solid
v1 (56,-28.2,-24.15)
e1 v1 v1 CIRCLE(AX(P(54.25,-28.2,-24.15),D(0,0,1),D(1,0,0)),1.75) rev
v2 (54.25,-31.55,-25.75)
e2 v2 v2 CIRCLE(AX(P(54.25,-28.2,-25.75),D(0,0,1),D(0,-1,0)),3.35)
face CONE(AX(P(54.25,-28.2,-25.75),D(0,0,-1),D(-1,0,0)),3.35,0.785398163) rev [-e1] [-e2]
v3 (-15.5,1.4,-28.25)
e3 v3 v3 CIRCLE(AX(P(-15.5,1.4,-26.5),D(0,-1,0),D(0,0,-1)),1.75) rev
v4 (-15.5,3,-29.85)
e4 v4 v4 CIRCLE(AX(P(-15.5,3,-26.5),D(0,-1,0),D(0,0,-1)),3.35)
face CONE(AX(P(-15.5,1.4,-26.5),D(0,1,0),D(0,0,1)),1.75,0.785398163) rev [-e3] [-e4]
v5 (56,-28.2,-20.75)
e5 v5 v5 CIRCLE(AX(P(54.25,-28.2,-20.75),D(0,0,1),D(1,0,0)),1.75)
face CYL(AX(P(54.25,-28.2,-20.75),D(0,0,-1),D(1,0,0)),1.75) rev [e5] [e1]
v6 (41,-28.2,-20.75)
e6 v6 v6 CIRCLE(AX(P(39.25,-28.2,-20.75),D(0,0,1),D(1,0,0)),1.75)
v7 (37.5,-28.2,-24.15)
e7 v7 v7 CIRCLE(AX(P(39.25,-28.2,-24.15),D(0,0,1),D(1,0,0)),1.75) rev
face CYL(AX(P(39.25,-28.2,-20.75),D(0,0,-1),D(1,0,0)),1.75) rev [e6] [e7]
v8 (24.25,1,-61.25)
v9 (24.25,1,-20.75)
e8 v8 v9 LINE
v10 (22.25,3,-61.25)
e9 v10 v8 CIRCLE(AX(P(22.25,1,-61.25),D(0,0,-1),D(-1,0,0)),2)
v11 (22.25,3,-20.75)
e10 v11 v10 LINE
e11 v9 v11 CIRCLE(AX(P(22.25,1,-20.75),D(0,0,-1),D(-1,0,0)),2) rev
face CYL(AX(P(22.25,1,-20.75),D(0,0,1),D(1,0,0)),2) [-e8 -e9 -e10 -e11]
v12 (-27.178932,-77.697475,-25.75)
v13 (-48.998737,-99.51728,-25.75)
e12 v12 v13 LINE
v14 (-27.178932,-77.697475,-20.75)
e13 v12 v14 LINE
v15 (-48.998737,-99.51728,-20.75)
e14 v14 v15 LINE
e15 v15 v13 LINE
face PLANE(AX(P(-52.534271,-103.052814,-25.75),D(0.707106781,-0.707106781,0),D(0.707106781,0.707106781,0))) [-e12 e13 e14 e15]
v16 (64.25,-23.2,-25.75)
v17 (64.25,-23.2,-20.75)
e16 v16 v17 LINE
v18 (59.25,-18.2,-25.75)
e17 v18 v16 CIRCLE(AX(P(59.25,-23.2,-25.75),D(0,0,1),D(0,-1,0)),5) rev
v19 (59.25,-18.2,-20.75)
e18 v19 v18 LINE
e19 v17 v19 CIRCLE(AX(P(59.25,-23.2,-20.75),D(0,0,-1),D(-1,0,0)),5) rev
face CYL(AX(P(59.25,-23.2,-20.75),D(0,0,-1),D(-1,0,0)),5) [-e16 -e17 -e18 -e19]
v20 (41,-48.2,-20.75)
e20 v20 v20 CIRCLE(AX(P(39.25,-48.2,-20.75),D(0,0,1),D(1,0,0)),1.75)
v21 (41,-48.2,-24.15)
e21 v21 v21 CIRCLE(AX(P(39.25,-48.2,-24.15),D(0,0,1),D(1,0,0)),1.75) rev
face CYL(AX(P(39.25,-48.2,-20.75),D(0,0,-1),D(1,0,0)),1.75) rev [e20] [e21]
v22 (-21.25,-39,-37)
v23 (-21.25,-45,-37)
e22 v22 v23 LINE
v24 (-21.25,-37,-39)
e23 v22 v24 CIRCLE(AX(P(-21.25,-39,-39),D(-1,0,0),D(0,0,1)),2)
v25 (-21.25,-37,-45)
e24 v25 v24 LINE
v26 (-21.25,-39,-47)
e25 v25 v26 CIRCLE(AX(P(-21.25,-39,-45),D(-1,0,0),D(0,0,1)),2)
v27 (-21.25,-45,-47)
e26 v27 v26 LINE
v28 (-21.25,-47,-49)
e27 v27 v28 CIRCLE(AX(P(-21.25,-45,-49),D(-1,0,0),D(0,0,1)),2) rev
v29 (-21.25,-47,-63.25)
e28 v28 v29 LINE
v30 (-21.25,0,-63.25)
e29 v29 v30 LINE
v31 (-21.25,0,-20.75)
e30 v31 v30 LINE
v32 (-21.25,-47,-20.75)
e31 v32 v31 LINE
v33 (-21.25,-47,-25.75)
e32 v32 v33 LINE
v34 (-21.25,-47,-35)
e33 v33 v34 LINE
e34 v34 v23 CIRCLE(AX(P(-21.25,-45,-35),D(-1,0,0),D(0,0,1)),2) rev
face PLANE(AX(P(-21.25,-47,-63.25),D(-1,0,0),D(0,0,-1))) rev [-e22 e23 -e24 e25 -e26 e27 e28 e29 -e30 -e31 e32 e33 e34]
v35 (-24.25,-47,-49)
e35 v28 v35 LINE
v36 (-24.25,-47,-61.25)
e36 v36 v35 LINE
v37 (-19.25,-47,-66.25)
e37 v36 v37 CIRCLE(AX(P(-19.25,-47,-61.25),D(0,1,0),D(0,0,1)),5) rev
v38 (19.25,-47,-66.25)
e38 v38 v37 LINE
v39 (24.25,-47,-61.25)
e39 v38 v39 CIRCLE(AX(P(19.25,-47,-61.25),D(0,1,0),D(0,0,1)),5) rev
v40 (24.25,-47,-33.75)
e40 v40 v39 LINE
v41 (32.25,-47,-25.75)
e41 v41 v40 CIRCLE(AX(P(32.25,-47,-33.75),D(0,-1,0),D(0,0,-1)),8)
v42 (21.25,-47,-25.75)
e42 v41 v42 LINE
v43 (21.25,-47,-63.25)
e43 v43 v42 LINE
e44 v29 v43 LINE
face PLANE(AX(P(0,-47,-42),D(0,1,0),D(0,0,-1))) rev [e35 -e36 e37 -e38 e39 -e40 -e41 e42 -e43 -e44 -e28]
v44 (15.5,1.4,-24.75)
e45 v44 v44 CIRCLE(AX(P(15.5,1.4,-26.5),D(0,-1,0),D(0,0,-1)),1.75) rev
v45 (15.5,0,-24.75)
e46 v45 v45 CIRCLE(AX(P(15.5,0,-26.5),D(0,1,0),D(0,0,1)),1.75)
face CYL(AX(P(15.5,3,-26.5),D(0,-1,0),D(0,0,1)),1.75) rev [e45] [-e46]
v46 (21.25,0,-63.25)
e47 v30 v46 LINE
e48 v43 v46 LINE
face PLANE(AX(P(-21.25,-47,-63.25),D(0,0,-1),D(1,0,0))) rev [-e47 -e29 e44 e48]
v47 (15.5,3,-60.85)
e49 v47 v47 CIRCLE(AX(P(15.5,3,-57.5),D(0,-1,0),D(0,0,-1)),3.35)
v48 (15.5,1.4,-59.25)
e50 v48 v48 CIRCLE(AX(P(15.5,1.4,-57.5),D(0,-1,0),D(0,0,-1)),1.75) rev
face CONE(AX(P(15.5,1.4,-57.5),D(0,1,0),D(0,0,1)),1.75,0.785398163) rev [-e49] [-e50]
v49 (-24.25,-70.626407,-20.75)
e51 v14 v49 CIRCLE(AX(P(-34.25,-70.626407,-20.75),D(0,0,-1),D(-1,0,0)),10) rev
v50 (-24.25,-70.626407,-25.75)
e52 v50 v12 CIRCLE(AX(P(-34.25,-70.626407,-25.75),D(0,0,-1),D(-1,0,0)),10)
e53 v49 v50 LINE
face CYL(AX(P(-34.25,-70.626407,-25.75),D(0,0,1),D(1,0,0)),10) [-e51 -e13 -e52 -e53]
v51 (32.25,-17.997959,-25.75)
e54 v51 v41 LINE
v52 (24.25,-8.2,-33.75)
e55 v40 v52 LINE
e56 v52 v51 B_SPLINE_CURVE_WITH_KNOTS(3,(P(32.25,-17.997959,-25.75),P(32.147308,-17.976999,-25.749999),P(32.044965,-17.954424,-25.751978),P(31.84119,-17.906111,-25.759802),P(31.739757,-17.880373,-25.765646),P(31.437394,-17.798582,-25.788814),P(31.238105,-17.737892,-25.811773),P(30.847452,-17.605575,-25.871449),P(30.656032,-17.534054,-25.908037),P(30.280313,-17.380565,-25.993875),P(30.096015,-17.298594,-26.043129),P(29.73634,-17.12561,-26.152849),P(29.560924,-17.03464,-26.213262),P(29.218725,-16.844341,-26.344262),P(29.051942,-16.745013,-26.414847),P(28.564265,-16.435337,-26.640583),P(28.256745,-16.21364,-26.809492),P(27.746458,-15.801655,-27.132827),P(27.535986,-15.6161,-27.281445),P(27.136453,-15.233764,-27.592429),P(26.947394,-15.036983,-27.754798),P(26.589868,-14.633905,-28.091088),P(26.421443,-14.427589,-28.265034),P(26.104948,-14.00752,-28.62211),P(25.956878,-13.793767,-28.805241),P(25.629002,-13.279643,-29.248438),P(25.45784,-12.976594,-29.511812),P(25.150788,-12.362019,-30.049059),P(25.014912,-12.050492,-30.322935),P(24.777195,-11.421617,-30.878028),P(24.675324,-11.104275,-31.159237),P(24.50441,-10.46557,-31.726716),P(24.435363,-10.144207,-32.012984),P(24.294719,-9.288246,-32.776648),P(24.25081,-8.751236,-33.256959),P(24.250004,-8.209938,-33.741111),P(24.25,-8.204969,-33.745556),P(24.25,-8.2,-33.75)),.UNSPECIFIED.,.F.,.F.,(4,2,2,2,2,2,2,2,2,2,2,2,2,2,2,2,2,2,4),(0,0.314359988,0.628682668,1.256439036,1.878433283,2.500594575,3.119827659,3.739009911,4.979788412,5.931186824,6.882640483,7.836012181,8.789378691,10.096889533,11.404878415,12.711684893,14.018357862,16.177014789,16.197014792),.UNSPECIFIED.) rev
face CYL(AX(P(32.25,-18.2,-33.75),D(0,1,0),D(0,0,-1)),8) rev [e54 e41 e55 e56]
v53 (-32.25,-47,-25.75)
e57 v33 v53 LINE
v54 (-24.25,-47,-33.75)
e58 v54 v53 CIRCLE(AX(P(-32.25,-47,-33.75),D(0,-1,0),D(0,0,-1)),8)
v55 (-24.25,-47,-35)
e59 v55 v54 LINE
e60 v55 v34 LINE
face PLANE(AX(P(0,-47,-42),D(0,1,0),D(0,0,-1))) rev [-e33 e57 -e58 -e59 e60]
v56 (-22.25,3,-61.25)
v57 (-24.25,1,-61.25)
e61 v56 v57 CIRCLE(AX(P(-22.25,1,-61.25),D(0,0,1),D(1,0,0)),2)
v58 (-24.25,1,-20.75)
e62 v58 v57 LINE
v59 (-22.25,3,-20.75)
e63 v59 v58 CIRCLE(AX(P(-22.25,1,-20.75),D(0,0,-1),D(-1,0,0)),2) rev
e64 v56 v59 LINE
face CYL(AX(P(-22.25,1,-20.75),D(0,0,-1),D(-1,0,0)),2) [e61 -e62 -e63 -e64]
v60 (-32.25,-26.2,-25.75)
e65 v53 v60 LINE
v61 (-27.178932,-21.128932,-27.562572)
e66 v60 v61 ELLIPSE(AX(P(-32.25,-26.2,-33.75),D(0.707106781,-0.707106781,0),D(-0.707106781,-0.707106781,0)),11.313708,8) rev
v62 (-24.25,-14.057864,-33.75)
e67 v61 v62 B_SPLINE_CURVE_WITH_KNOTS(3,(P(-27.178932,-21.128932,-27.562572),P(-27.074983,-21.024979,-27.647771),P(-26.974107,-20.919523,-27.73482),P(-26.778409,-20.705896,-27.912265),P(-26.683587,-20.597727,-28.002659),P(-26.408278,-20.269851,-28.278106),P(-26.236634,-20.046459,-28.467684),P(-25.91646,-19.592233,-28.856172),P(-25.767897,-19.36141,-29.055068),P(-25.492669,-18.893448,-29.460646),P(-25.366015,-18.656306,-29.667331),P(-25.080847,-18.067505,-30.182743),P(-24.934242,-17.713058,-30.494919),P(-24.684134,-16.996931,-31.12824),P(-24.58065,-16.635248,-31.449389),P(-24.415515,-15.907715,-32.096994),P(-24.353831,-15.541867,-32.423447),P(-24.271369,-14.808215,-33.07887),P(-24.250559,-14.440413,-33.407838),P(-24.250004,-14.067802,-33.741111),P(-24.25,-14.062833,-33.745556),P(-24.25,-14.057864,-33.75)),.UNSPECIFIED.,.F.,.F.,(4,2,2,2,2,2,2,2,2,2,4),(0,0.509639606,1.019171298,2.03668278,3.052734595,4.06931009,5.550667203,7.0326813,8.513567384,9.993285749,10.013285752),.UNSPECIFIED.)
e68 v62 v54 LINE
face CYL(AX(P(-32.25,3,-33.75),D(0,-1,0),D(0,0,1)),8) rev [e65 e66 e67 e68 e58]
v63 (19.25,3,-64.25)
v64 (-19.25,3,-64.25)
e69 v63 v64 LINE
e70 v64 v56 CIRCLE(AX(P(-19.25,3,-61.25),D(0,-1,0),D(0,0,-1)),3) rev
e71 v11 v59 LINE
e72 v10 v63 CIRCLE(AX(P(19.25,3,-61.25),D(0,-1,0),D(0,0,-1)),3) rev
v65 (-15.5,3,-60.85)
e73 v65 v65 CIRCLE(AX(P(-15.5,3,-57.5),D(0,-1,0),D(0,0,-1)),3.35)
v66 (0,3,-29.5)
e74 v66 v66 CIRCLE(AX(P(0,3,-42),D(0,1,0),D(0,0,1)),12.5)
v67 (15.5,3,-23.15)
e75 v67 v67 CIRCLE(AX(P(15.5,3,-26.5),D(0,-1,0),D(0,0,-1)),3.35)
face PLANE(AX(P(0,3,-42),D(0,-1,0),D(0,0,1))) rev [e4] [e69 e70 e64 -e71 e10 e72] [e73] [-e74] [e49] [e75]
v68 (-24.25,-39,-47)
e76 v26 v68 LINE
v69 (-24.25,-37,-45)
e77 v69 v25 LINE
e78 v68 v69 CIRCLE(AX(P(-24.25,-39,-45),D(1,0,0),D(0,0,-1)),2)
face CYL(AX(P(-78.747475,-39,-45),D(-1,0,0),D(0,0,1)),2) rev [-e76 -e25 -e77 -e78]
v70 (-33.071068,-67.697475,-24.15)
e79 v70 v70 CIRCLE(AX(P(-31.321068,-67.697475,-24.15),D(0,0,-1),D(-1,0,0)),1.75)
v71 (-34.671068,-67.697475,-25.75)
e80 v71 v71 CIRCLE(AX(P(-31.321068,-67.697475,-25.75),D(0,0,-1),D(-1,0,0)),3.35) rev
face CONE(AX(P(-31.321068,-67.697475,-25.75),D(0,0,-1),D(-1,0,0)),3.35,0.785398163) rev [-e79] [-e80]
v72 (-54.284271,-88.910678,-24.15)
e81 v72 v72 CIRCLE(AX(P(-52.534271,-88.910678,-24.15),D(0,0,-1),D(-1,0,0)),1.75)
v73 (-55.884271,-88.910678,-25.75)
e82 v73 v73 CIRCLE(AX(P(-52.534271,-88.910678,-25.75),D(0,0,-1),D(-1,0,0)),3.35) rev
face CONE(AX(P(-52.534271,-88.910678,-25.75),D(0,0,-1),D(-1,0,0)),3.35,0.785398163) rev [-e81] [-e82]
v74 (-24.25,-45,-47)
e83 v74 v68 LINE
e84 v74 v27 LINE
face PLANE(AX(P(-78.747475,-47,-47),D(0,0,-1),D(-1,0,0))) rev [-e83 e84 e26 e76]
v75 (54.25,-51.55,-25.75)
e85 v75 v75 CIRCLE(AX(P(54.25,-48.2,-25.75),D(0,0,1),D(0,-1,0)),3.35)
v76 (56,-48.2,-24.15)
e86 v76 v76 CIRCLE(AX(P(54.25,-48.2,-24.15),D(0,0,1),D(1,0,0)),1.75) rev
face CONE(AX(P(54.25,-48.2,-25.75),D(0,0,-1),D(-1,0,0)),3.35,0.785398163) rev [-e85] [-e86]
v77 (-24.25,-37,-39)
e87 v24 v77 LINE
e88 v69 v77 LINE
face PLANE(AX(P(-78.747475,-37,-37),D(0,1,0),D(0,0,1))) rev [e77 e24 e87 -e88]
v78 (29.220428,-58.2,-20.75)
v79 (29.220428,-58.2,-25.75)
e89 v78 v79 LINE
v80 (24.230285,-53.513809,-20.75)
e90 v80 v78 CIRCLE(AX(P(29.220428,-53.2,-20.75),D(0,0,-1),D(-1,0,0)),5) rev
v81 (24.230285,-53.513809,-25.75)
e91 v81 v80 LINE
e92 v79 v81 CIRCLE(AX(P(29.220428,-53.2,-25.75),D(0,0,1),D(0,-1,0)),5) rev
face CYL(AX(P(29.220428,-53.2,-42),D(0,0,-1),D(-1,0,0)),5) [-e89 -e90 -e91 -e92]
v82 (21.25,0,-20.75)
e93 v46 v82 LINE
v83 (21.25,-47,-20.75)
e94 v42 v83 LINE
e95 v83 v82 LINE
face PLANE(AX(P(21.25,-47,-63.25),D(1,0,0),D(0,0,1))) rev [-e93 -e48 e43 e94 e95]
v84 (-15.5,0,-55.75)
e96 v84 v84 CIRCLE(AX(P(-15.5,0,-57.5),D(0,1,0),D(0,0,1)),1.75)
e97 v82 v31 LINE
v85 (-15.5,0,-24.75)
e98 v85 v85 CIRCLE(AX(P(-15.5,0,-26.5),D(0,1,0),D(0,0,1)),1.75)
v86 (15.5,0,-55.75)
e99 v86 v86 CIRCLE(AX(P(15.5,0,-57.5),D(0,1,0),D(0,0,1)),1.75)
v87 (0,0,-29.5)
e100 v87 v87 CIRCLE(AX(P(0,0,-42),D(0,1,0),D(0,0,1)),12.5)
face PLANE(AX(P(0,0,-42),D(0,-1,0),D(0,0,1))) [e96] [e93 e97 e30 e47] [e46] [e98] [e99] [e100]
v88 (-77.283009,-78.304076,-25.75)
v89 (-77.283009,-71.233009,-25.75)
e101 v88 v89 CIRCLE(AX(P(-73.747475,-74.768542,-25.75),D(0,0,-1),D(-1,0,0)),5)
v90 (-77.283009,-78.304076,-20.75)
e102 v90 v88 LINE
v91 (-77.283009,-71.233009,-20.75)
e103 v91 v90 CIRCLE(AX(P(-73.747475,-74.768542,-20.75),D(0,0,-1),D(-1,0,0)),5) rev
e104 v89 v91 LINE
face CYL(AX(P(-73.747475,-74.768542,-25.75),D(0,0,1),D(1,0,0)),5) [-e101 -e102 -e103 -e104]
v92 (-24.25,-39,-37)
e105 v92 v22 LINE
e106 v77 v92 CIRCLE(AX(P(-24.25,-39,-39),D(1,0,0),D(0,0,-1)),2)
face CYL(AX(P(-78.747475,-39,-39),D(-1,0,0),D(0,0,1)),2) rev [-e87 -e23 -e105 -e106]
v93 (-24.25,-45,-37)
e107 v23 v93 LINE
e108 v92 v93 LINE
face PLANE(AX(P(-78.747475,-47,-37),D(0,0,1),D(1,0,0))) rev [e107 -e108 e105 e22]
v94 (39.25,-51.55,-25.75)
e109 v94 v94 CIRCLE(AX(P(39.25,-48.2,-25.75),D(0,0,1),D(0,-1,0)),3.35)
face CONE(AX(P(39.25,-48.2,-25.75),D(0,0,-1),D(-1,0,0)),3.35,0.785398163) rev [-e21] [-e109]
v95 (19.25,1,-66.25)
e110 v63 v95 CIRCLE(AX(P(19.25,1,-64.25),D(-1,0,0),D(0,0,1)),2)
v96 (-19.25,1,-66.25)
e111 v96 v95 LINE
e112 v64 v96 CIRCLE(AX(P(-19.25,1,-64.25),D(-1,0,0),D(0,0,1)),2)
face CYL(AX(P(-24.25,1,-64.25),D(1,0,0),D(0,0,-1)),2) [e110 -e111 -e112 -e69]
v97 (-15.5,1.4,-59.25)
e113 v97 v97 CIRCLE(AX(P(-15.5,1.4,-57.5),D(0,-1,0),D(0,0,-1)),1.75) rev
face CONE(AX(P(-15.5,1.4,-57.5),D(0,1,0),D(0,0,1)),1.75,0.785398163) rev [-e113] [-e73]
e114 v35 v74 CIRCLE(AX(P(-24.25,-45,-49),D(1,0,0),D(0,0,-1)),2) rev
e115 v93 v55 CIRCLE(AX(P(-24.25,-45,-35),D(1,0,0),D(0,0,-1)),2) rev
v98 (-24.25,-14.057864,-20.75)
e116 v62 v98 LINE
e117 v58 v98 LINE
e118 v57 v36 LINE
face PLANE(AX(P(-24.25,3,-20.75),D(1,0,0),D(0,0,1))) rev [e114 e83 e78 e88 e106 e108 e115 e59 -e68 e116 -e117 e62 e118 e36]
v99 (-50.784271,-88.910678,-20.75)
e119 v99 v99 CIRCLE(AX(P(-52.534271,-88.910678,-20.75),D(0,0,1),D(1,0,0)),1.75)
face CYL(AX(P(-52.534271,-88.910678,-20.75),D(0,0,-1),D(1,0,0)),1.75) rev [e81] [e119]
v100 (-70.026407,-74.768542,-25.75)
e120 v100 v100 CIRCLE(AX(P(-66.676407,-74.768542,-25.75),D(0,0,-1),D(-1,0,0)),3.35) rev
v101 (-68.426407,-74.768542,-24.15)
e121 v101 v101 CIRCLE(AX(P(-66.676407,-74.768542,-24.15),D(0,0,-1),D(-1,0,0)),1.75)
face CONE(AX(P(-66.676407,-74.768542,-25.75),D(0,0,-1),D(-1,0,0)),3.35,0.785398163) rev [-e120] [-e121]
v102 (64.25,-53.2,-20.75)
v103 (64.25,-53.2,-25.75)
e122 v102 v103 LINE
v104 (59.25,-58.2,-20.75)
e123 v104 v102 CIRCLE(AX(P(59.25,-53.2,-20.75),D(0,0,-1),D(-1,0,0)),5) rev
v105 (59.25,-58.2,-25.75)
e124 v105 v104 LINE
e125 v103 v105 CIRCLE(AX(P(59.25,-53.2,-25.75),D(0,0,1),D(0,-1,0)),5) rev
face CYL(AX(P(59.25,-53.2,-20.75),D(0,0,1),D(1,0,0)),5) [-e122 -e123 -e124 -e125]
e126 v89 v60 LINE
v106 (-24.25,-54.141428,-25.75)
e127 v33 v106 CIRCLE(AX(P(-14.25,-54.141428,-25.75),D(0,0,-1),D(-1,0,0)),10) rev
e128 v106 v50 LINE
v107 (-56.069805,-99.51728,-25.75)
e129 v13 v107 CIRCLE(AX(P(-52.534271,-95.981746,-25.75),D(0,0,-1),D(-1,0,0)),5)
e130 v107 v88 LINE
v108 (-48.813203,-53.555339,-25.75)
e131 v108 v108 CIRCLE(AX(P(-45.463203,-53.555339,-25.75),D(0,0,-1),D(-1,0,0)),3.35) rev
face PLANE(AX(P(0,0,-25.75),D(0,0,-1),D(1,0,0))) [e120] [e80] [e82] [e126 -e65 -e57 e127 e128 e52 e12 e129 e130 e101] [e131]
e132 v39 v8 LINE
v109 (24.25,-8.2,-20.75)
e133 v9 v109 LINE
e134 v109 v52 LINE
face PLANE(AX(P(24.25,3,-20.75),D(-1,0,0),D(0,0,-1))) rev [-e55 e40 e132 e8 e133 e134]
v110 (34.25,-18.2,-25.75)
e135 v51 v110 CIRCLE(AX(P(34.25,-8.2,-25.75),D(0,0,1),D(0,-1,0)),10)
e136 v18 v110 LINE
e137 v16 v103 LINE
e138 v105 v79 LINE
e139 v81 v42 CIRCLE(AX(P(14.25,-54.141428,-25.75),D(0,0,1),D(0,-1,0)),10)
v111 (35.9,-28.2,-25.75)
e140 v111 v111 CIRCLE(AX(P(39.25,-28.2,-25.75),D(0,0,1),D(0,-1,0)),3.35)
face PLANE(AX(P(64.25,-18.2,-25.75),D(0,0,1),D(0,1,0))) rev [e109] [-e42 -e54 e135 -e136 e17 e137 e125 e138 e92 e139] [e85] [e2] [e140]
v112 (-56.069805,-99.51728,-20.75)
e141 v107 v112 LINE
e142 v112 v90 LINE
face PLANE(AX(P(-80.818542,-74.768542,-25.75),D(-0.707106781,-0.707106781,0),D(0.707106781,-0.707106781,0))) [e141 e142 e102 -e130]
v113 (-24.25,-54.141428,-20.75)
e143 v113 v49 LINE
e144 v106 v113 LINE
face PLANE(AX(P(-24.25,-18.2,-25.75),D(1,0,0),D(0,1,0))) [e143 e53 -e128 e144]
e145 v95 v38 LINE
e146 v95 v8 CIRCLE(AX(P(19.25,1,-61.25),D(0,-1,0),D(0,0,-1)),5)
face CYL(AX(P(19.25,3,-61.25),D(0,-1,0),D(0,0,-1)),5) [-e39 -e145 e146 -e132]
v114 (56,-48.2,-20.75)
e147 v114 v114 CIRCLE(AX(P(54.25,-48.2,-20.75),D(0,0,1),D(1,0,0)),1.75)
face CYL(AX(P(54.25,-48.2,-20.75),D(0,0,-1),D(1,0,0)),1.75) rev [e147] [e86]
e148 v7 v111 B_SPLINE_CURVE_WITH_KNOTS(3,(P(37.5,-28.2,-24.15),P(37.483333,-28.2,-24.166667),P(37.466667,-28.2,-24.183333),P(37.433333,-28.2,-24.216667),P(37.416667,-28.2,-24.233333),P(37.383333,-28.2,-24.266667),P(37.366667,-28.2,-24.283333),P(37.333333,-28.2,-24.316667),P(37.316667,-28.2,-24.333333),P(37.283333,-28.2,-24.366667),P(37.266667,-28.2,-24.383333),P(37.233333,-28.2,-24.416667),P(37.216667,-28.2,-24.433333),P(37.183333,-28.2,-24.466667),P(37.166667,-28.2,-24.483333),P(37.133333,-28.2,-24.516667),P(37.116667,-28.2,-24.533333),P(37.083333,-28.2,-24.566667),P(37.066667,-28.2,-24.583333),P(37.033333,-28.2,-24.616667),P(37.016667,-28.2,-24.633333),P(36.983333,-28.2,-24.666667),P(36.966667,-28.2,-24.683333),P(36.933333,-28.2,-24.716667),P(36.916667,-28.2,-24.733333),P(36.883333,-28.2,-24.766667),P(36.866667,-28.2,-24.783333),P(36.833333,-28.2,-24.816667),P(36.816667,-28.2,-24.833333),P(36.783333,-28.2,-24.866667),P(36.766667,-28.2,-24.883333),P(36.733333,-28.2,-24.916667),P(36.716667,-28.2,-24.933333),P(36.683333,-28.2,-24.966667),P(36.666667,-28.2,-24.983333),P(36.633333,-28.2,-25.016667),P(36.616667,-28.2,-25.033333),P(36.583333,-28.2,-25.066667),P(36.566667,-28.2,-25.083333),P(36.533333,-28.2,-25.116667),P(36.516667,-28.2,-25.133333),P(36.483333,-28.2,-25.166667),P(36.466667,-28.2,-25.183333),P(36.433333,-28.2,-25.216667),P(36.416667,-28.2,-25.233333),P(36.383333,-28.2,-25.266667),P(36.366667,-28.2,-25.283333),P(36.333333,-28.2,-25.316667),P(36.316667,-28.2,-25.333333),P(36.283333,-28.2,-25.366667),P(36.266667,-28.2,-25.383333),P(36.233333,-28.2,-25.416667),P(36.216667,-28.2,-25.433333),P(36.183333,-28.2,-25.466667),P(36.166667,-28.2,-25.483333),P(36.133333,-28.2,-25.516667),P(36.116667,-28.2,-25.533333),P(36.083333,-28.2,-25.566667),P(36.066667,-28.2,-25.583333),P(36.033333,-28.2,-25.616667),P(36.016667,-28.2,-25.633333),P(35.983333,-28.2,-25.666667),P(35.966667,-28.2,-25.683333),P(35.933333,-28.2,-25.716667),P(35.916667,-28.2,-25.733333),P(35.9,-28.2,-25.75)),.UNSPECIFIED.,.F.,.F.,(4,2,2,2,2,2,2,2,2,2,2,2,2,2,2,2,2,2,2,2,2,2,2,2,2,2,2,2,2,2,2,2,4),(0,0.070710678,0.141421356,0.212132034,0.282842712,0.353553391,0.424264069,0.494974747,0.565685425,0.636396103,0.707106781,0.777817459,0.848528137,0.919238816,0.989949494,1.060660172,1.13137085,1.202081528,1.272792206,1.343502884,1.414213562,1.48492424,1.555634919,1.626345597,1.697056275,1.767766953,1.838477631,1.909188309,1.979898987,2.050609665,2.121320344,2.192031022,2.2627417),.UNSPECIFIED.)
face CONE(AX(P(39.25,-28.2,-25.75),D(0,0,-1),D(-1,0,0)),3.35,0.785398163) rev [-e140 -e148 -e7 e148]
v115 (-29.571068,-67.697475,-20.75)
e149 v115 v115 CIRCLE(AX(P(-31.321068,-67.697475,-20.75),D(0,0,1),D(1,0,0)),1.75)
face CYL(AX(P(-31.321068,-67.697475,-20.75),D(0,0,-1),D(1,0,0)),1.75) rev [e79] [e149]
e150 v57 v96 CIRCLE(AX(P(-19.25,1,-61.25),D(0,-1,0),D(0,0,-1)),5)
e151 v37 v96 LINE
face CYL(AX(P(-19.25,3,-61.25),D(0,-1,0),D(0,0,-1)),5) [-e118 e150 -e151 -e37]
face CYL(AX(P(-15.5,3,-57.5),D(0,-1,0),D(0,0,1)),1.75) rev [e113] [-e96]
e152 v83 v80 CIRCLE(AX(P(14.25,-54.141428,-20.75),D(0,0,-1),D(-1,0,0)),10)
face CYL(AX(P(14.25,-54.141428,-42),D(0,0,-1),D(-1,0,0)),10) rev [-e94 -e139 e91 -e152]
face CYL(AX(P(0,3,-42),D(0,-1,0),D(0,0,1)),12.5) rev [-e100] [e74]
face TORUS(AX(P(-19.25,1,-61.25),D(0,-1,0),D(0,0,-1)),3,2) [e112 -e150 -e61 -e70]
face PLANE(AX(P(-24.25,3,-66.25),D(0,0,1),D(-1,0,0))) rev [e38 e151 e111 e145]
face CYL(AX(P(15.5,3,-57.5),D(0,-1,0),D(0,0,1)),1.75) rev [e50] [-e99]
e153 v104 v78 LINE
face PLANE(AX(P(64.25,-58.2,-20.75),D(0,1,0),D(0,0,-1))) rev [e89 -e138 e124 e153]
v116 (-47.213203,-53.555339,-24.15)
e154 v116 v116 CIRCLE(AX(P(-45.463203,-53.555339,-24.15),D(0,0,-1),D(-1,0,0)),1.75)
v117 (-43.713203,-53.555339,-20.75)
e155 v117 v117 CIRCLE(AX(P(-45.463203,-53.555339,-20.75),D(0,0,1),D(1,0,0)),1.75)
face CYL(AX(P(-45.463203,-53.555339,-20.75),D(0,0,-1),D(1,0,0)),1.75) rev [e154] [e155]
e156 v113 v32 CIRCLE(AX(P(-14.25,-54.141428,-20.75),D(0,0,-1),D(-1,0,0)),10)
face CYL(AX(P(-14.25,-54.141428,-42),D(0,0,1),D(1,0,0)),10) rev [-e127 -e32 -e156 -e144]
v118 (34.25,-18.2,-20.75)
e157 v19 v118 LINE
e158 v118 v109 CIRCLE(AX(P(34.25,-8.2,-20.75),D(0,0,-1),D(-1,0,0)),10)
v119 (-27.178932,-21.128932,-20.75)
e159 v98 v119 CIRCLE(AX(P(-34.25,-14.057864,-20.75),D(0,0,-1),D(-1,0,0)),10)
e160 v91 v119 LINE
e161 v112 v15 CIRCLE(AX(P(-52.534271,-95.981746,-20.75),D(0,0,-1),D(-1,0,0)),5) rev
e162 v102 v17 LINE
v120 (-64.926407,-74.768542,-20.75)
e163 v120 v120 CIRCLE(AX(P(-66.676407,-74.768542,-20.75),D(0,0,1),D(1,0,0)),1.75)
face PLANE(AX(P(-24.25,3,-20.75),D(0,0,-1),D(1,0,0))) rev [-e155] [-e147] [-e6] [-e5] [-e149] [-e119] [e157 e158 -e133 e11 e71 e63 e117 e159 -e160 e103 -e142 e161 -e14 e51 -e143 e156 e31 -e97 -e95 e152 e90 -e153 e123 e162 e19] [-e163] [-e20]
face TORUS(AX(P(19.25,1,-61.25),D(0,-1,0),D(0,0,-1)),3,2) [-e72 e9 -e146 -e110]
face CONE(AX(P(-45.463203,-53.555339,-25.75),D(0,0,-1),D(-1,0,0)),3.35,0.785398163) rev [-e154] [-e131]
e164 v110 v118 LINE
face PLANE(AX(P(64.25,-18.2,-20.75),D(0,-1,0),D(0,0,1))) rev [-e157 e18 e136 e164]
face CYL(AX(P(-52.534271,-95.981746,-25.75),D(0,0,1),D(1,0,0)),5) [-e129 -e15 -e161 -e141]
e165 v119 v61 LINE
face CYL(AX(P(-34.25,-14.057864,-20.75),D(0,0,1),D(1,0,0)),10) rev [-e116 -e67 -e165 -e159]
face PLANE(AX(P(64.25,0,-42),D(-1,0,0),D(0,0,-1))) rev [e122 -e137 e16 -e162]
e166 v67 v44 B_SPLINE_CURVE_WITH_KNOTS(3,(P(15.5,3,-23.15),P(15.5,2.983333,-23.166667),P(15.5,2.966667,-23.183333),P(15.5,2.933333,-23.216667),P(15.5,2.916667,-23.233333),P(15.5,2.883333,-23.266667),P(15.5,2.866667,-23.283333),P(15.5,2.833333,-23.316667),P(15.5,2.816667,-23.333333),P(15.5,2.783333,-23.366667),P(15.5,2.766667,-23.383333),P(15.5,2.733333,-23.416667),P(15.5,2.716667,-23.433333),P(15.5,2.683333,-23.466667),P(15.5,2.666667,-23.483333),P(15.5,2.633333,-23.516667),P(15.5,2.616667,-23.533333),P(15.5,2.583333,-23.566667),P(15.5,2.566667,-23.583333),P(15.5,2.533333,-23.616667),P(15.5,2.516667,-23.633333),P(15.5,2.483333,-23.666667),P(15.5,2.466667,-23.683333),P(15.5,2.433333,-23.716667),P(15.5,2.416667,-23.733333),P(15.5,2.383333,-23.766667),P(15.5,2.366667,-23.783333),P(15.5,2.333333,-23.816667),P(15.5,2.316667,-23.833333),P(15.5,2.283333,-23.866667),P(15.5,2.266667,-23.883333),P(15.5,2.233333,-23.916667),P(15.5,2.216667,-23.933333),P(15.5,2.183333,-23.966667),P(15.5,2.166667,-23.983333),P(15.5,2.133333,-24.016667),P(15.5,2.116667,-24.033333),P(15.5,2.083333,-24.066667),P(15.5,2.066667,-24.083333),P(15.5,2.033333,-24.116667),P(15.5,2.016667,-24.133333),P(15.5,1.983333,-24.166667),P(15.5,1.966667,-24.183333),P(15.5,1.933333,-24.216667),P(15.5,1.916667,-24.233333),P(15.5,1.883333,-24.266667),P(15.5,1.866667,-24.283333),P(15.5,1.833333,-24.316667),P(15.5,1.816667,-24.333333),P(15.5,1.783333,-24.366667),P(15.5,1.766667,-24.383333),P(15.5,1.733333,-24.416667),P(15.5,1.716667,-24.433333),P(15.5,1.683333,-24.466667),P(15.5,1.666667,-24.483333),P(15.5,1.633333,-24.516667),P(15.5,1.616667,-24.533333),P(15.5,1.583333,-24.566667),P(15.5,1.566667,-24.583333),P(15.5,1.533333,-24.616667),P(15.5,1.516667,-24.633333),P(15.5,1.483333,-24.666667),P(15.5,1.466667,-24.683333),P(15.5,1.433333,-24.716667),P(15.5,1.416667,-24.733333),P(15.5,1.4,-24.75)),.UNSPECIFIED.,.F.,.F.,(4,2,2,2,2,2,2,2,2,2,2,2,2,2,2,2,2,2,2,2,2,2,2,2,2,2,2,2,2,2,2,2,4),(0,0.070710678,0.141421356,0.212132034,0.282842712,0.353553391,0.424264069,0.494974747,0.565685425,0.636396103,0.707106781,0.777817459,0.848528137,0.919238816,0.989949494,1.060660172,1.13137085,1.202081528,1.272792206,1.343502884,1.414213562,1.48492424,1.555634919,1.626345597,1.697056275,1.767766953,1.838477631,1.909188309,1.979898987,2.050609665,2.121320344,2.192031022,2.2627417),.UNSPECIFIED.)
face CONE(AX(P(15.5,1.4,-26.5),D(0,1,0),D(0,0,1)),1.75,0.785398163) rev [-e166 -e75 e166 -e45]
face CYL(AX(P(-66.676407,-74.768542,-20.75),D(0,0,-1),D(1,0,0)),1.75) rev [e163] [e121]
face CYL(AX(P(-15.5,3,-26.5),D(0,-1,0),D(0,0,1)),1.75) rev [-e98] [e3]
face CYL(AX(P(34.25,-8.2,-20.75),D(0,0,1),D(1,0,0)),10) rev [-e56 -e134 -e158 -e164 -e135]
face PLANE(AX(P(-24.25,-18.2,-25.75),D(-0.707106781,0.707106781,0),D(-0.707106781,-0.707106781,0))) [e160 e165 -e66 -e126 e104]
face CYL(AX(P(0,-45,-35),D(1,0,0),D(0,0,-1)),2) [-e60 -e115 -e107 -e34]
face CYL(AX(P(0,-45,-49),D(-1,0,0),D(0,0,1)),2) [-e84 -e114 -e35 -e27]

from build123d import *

# Parameters (mm, degrees)
SKETCH1_W                     = 48.5
SKETCH1_H                     = 45.5
BOSS_EXTRUDE1_DEPTH           = 3
BOSS_EXTRUDE2_DEPTH           = 47
SKETCH3_W                     = 5
SKETCH3_H                     = 40
BOSS_EXTRUDE3_DEPTH           = 40
BOSS_EXTRUDE4_DEPTH           = 5
FILLET1_R                     = 8
SKETCH5_R                     = 1.75
SKETCH5_R_2                   = 12.5
CUT_EXTRUDE1_DEPTH            = 134.19002114
SKETCH7_R                     = 1.75
CUT_EXTRUDE2_DEPTH            = 138.083074197
BODY_MOVE_COPY1_START         = -20.75
BODY_MOVE_COPY1_OUTLINE_R     = 1.75
BODY_MOVE_COPY1_DEPTH         = 45
BODY_MOVE_COPY1_START_2       = -33.75
BODY_MOVE_COPY1_2_OUTLINE_R   = 1.75
BODY_MOVE_COPY1_2_DEPTH       = 12.5
BODY_MOVE_COPY1_START_3       = -66.25
BODY_MOVE_COPY1_3_DEPTH       = 36.7500001
BODY_MOVE_COPY1_4_OUTLINE_W   = 42.5
BODY_MOVE_COPY1_4_OUTLINE_H   = 47
BODY_MOVE_COPY1_4_DEPTH       = 3
BODY_MOVE_COPY1_START_4       = -104
BODY_MOVE_COPY1_5_OUTLINE_R   = 1.75
BODY_MOVE_COPY1_5_OUTLINE_R_2 = 12.5
BODY_MOVE_COPY1_5_DEPTH       = 107
BODY_MOVE_COPY1_START_5       = -87.255885421
BODY_MOVE_COPY1_6_DEPTH       = 40.255885421
FILLET2_R                     = 5
FILLET3_START                 = -28.2363
FILLET3_DEPTH                 = 7.4863
FILLET3_START_2               = -33.7500001
FILLET3_2_DEPTH               = 13.0000001
FILLET3_START_3               = -25.75
FILLET3_3_DEPTH               = 5
FILLET3_4_DEPTH               = 8.4719001
FILLET3_START_4               = -47.0000001
FILLET3_5_DEPTH               = 40.0000001
FILLET4_R                     = 5
FILLET5_R                     = 5
FILLET6_R                     = 2
SKETCH8_W                     = 10
SKETCH8_H                     = 10
CUT_EXTRUDE3_DEPTH            = 148.975084215
FILLET7_R                     = 2
CHAMFER1_SIZE                 = 1.6
CHAMFER2_SIZE                 = 1.6


with BuildPart() as part:
    # Sketch1 → Boss-Extrude1 (new body)
    with BuildSketch(Plane(origin=(0, 0, 0), x_dir=(1, 0, 0), z_dir=(0, 1, 0))):
        with Locations((0, -1.5)):
            Rectangle(SKETCH1_W, SKETCH1_H)
    extrude(amount=BOSS_EXTRUDE1_DEPTH)

    # Sketch2 → Boss-Extrude2 (add)
    with BuildSketch(Plane.XZ):
        Polygon((-21.25, 21.25), (21.25, 21.25), (21.25, -21.25), (24.25, -21.25), (24.25, 24.25), (-24.25, 24.25), (-24.25, -21.25), (-21.25, -21.25), align=None)
    extrude(amount=BOSS_EXTRUDE2_DEPTH)

    # Sketch3 → Boss-Extrude3 (add)
    with BuildSketch(Plane(origin=(24.25, 0, 0), x_dir=(0, 0, -1), z_dir=(1, 0, 0))):
        with Locations((18.75, -38.2)):
            Rectangle(SKETCH3_W, SKETCH3_H)
    extrude(amount=BOSS_EXTRUDE3_DEPTH)

    # Sketch4 → Boss-Extrude4 (add)
    with BuildSketch(Plane(origin=(0, 0, -21.25), x_dir=(-1, 0, 0), z_dir=(0, 0, -1))):
        Polygon((24.25, -18.2), (80.818542495, -74.768542495), (52.534271247, -103.052813742), (24.25, -74.768542495), align=None)
    extrude(amount=-BOSS_EXTRUDE4_DEPTH)

    # Fillet1
    fillet1_edges = [part.edges().sort_by_distance(p)[0] for p in [
        (24.25, -32.6, -16.25),
        (-24.25, -32.6, -16.25),
    ]]
    fillet(fillet1_edges, radius=FILLET1_R)

    # Sketch5 → Cut-Extrude1 (cut, through all)
    with BuildSketch(Plane.XZ):
        with Locations(Location((-15.5, 15.5, 0), (0, 0, 270))):
            Circle(SKETCH5_R)
        with Locations(Location((15.5, 15.5, 0), (0, 0, 270))):
            Circle(SKETCH5_R)
        with Locations(Location((15.5, -15.5, 0), (0, 0, 270))):
            Circle(SKETCH5_R)
        with Locations(Location((-15.5, -15.5, 0), (0, 0, 270))):
            Circle(SKETCH5_R)
        with Locations(Location((0, 0, 0), (0, 0, 270))):
            Circle(SKETCH5_R_2)
    extrude(amount=-CUT_EXTRUDE1_DEPTH, mode=Mode.SUBTRACT)

    # Sketch7 → Cut-Extrude2 (cut, through all)
    with BuildSketch(Plane.XY.offset(-16.25)):
        with Locations((54.25, -28.2)):
            Circle(SKETCH7_R)
        with Locations((54.25, -48.2)):
            Circle(SKETCH7_R)
        with Locations((-66.676406871, -74.768542495)):
            Circle(SKETCH7_R)
        with Locations((-52.534271247, -88.910678119)):
            Circle(SKETCH7_R)
        with Locations((39.25, -28.2)):
            Circle(SKETCH7_R)
        with Locations((39.25, -48.2)):
            Circle(SKETCH7_R)
        with Locations((-45.463203436, -53.555339059)):
            Circle(SKETCH7_R)
        with Locations((-31.321067812, -67.697474683)):
            Circle(SKETCH7_R)
    extrude(amount=-CUT_EXTRUDE2_DEPTH, mode=Mode.SUBTRACT)

    # Body-Move/Copy1: read off the stored shape, not the designer's step
    # Body-Move/Copy1 outline → Body-Move/Copy1 (cut)
    with BuildSketch(Plane.XY.offset(BODY_MOVE_COPY1_START)):
        Polygon((-24.25, -74.768542495), (-24.25, -47), (24.25, -47), (24.25, -58.2), (64.25, -58.2), (64.25, -18.2), (24.25, -18.2), (24.25, 3), (-24.25, 3), (-24.25, -18.2), (-80.818542495, -74.768542495), (-52.534271247, -103.052813742), align=None)
        with Locations((-52.534271247, -88.910678119)):
            Circle(BODY_MOVE_COPY1_OUTLINE_R, mode=Mode.SUBTRACT)
        with Locations((-66.676406871, -74.768542495)):
            Circle(BODY_MOVE_COPY1_OUTLINE_R, mode=Mode.SUBTRACT)
        with Locations((-45.463203436, -53.555339059)):
            Circle(BODY_MOVE_COPY1_OUTLINE_R, mode=Mode.SUBTRACT)
        with Locations((-31.321067812, -67.697474683)):
            Circle(BODY_MOVE_COPY1_OUTLINE_R, mode=Mode.SUBTRACT)
        with Locations((39.25, -48.2)):
            Circle(BODY_MOVE_COPY1_OUTLINE_R, mode=Mode.SUBTRACT)
        with Locations((54.25, -48.2)):
            Circle(BODY_MOVE_COPY1_OUTLINE_R, mode=Mode.SUBTRACT)
        with Locations((39.25, -28.2)):
            Circle(BODY_MOVE_COPY1_OUTLINE_R, mode=Mode.SUBTRACT)
        with Locations((54.25, -28.2)):
            Circle(BODY_MOVE_COPY1_OUTLINE_R, mode=Mode.SUBTRACT)
    extrude(amount=BODY_MOVE_COPY1_DEPTH, mode=Mode.SUBTRACT)

    # Body-Move_Copy1 2 outline → Body-Move_Copy1 2 (add)
    with BuildSketch(Plane.XY.offset(BODY_MOVE_COPY1_START_2)):
        Polygon((-24.25, -74.768542495), (-24.25, -47), (-21.25, -47), (-21.25, 0), (21.25, 0), (21.25, -47), (24.25, -47), (24.25, -58.2), (64.25, -58.2), (64.25, -18.2), (24.25, -18.2), (24.25, 3), (-24.25, 3), (-24.25, -18.2), (-80.818542495, -74.768542495), (-52.534271247, -103.052813742), align=None)
        with Locations((-52.534271247, -88.910678119)):
            Circle(BODY_MOVE_COPY1_2_OUTLINE_R, mode=Mode.SUBTRACT)
        with Locations((-66.676406871, -74.768542495)):
            Circle(BODY_MOVE_COPY1_2_OUTLINE_R, mode=Mode.SUBTRACT)
        with Locations((-45.463203436, -53.555339059)):
            Circle(BODY_MOVE_COPY1_2_OUTLINE_R, mode=Mode.SUBTRACT)
        with Locations((-31.321067812, -67.697474683)):
            Circle(BODY_MOVE_COPY1_2_OUTLINE_R, mode=Mode.SUBTRACT)
        with Locations((39.25, -48.2)):
            Circle(BODY_MOVE_COPY1_2_OUTLINE_R, mode=Mode.SUBTRACT)
        with Locations((54.25, -48.2)):
            Circle(BODY_MOVE_COPY1_2_OUTLINE_R, mode=Mode.SUBTRACT)
        with Locations((39.25, -28.2)):
            Circle(BODY_MOVE_COPY1_2_OUTLINE_R, mode=Mode.SUBTRACT)
        with Locations((54.25, -28.2)):
            Circle(BODY_MOVE_COPY1_2_OUTLINE_R, mode=Mode.SUBTRACT)
    extrude(amount=BODY_MOVE_COPY1_2_DEPTH)

    # Body-Move_Copy1 3 outline → Body-Move_Copy1 3 (add)
    with BuildSketch(Plane.XY.offset(BODY_MOVE_COPY1_START_3)):
        Polygon((-24.25, 3), (-24.25, -47), (-21.25, -47), (-21.25, 0), (21.25, 0), (21.25, -47), (24.25, -47), (24.25, 3), align=None)
    extrude(amount=BODY_MOVE_COPY1_3_DEPTH)

    # Body-Move_Copy1 4 outline → Body-Move_Copy1 4 (add)
    with BuildSketch(Plane.XY.offset(BODY_MOVE_COPY1_START_3)):
        with Locations((0, -23.5)):
            Rectangle(BODY_MOVE_COPY1_4_OUTLINE_W, BODY_MOVE_COPY1_4_OUTLINE_H)
    extrude(amount=BODY_MOVE_COPY1_4_DEPTH)

    # Body-Move_Copy1 5 outline → Body-Move_Copy1 5 (cut)
    with BuildSketch(Plane(origin=(0, 0, 0), x_dir=(1, 0, 0), z_dir=(0, 1, 0)).offset(BODY_MOVE_COPY1_START_4)):
        with BuildLine():
            ThreePointArc((24.25, 33.75), (26.593145751, 28.093145751), (32.25, 25.75))
            Line((32.25, 25.75), (64.25, 25.75))
            Line((64.25, 25.75), (64.25, 33.75))
            Line((64.25, 33.75), (24.25, 33.75))
        make_face()
        with Locations((15.5, 26.5)):
            Circle(BODY_MOVE_COPY1_5_OUTLINE_R)
        with Locations((-15.5, 26.5)):
            Circle(BODY_MOVE_COPY1_5_OUTLINE_R)
        with BuildLine():
            Line((-82, 25.749999997), (-32.25, 25.75))
            ThreePointArc((-32.25, 25.75), (-26.593145751, 28.093145751), (-24.25, 33.75))
            Line((-24.25, 33.75), (-82, 33.75))
            Line((-82, 33.75), (-82, 25.749999997))
        make_face()
        with Locations((-15.5, 57.5)):
            Circle(BODY_MOVE_COPY1_5_OUTLINE_R)
        with Locations((0, 42)):
            Circle(BODY_MOVE_COPY1_5_OUTLINE_R_2)
        with Locations((15.5, 57.5)):
            Circle(BODY_MOVE_COPY1_5_OUTLINE_R)
    extrude(amount=BODY_MOVE_COPY1_5_DEPTH, mode=Mode.SUBTRACT)

    # Body-Move_Copy1 6 outline → Body-Move_Copy1 6 (cut)
    with BuildSketch(Plane(origin=(0, 0, 0), x_dir=(1, 0, 0), z_dir=(0, 1, 0)).offset(BODY_MOVE_COPY1_START_5)):
        with BuildLine():
            Line((24.25, 33.75), (24.25, 25.75))
            Line((24.25, 25.75), (32.25, 25.75))
            ThreePointArc((32.25, 25.75), (26.593145751, 28.093145751), (24.25, 33.75))
        make_face()
        with BuildLine():
            Line((-32.25, 25.75), (-24.25, 25.75))
            Line((-24.25, 25.75), (-24.25, 33.75))
            ThreePointArc((-24.25, 33.75), (-26.593145751, 28.093145751), (-32.25, 25.75))
        make_face()
    extrude(amount=BODY_MOVE_COPY1_6_DEPTH, mode=Mode.SUBTRACT)

    # Fillet2
    fillet2_edges = [part.edges().sort_by_distance(p)[0] for p in [
        (64.25, -18.2, -23.25),
        (64.25, -58.2, -23.25),
        (-80.818542495, -74.768542495, -23.499999999),
        (-52.534271247, -103.052813742, -23.499999999),
    ]]
    fillet(fillet2_edges, radius=FILLET2_R)

    # Fillet3: read off the stored shape, not the designer's step
    # Fillet3 outline → Fillet3 (cut)
    with BuildSketch(Plane.XY.offset(FILLET3_START)):
        with BuildLine():
            ThreePointArc((-24.25, -70.626406871), (-25.011204675, -74.453241195), (-27.178932188, -77.697474683))
            Line((-27.178932188, -77.697474683), (-24.25, -74.768542495))
            Line((-24.25, -74.768542495), (-24.25, -70.626406871))
        make_face()
    extrude(amount=FILLET3_DEPTH, mode=Mode.SUBTRACT)

    # Fillet3 2 outline → Fillet3 2 (add)
    with BuildSketch(Plane.XY.offset(FILLET3_START_2)):
        with BuildLine():
            ThreePointArc((34.25, -18.2), (27.178932188, -15.271067812), (24.25, -8.2))
            Line((24.25, -8.2), (24.25, -18.2))
            Line((24.25, -18.2), (34.25, -18.2))
        make_face()
    extrude(amount=FILLET3_2_DEPTH)

    # Fillet3 3 outline → Fillet3 3 (add)
    with BuildSketch(Plane.XY.offset(FILLET3_START_3)):
        with BuildLine():
            Line((24.25, -47), (21.25, -47))
            ThreePointArc((21.25, -47), (23.469544457, -50.268445083), (24.25, -54.141428429))
            Line((24.25, -54.141428429), (24.25, -47))
        make_face()
        with BuildLine():
            Line((-21.25, -47), (-24.25, -47))
            Line((-24.25, -47), (-24.25, -54.141428429))
            ThreePointArc((-24.25, -54.141428429), (-23.469544457, -50.268445083), (-21.25, -47))
        make_face()
        with BuildLine():
            ThreePointArc((-24.25, -14.057864376), (-25.011204675, -17.8846987), (-27.178932188, -21.128932188))
            Line((-27.178932188, -21.128932188), (-24.25, -18.2))
            Line((-24.25, -18.2), (-24.25, -14.057864376))
        make_face()
    extrude(amount=FILLET3_3_DEPTH)

    # Fillet3 4 outline → Fillet3 4 (add)
    with BuildSketch(Plane.XY.offset(FILLET3_START_2)):
        with BuildLine():
            ThreePointArc((-24.25, -14.057864376), (-25.011204675, -17.8846987), (-27.178932188, -21.128932188))
            Line((-27.178932188, -21.128932188), (-24.25, -18.2))
            Line((-24.25, -18.2), (-24.25, -14.057864376))
        make_face()
    extrude(amount=FILLET3_4_DEPTH)

    # Fillet3 5 outline → Fillet3 5 (cut)
    with BuildSketch(Plane(origin=(0, 0, 0), x_dir=(1, 0, 0), z_dir=(0, 1, 0)).offset(FILLET3_START_4)):
        with BuildLine():
            Line((36, 33.7500001), (24.25, 33.75))
            ThreePointArc((24.25, 33.75), (26.593145751, 28.093145751), (32.25, 25.75))
            Line((32.25, 25.75), (36, 25.749999999))
            Line((36, 25.749999999), (36, 33.7500001))
        make_face()
        with BuildLine():
            Line((-29, 33.7500001), (-29, 26.439904242))
            ThreePointArc((-29, 26.439904242), (-25.541796068, 29.391101057), (-24.25, 33.75))
            Line((-24.25, 33.75), (-29, 33.7500001))
        make_face()
    extrude(amount=FILLET3_5_DEPTH, mode=Mode.SUBTRACT)

    # Fillet4
    fillet4_edges = [part.edges().sort_by_distance(p)[0] for p in [
        (24.25, -58.2, -23.25),
    ]]
    fillet(fillet4_edges, radius=FILLET4_R)

    # Fillet5
    fillet5_edges = [part.edges().sort_by_distance(p)[0] for p in [
        (24.25, -22, -66.25),
        (-24.25, -22, -66.25),
    ]]
    fillet(fillet5_edges, radius=FILLET5_R)

    # Fillet6
    fillet6_edges = [part.edges().sort_by_distance(p)[0] for p in [
        (0, 3, -66.25),
        (24.25, 3, -41),
        (22.785533906, 3, -64.785533906),
        (-22.785533906, 3, -64.785533906),
        (-24.25, 3, -41),
    ]]
    fillet(fillet6_edges, radius=FILLET6_R)

    # Sketch8 → Cut-Extrude3 (cut, through all)
    with BuildSketch(Plane(origin=(-21.25, 0, 0), x_dir=(0, 0, -1), z_dir=(1, 0, 0))):
        with Locations((42, -42)):
            Rectangle(SKETCH8_W, SKETCH8_H)
    extrude(amount=-CUT_EXTRUDE3_DEPTH, mode=Mode.SUBTRACT)

    # Fillet7
    fillet7_edges = [part.edges().sort_by_distance(p)[0] for p in [
        (-22.75, -47, -47),
        (-22.75, -47, -37),
        (-22.75, -37, -37),
        (-22.75, -37, -47),
    ]]
    fillet(fillet7_edges, radius=FILLET7_R)

    # Chamfer1
    chamfer1_edges = [part.edges().sort_by_distance(p)[0] for p in [
        (-17.25, 3, -26.5),
        (13.75, 3, -26.5),
        (13.75, 3, -57.5),
        (-17.25, 3, -57.5),
    ]]
    chamfer(chamfer1_edges, length=CHAMFER1_SIZE)

    # Chamfer2
    # the kernel refuses this chamfer: 1.6 mm, written as the material it takes off along each edge
    with BuildSketch(Plane(origin=(39.25, -28.2, -25.75), x_dir=(1, 0, 0), z_dir=(0, -1, 0))) as chamfer2_piece_1:
        Polygon((1.75, CHAMFER2_SIZE), (1.75 + CHAMFER2_SIZE, 0), (1.75, 0), align=None)
    revolve(axis=Axis((39.25, -28.2, -25.75), (0, 0, 1)), mode=Mode.SUBTRACT)
    with BuildSketch(Plane(origin=(-52.534271247, -88.910678119, -25.749999999), x_dir=(1, 0, 0), z_dir=(0, -1, 0))) as chamfer2_piece_2:
        Polygon((1.75, CHAMFER2_SIZE), (1.75 + CHAMFER2_SIZE, CHAMFER2_SIZE * 1.26256782806e-10), (1.75, 0), align=None)
    revolve(axis=Axis((-52.534271247, -88.910678119, -25.749999999), (0, 0, 1)), mode=Mode.SUBTRACT)
    with BuildSketch(Plane(origin=(-66.676406871, -74.768542495, -25.749999998), x_dir=(1, 0, 0), z_dir=(0, -1, 0))) as chamfer2_piece_3:
        Polygon((1.75, CHAMFER2_SIZE), (1.75 + CHAMFER2_SIZE, CHAMFER2_SIZE * 1.26256782806e-10), (1.75, 0), align=None)
    revolve(axis=Axis((-66.676406871, -74.768542495, -25.749999998), (0, 0, 1)), mode=Mode.SUBTRACT)
    with BuildSketch(Plane(origin=(54.25, -48.2, -25.75), x_dir=(1, 0, 0), z_dir=(0, -1, 0))) as chamfer2_piece_4:
        Polygon((1.75, CHAMFER2_SIZE), (1.75 + CHAMFER2_SIZE, 0), (1.75, 0), align=None)
    revolve(axis=Axis((54.25, -48.2, -25.75), (0, 0, 1)), mode=Mode.SUBTRACT)
    with BuildSketch(Plane(origin=(39.25, -48.2, -25.75), x_dir=(1, 0, 0), z_dir=(0, -1, 0))) as chamfer2_piece_5:
        Polygon((1.75, CHAMFER2_SIZE), (1.75 + CHAMFER2_SIZE, 0), (1.75, 0), align=None)
    revolve(axis=Axis((39.25, -48.2, -25.75), (0, 0, 1)), mode=Mode.SUBTRACT)
    with BuildSketch(Plane(origin=(-31.321067812, -67.697474683, -25.75), x_dir=(-0.5308183932196885, -0.8474855948154328, 0), z_dir=(-0.8474855948154328, 0.5308183932196885, 0))) as chamfer2_piece_6:
        Polygon((1.75, CHAMFER2_SIZE), (1.75 + CHAMFER2_SIZE, 0), (1.75, 0), align=None)
    revolve(axis=Axis((-31.321067812, -67.697474683, -25.75), (0, 0, 1)), revolution_arc=122.060767051, mode=Mode.SUBTRACT)
    with BuildSketch(Plane(origin=(-45.463203436, -53.555339059, -25.749999999), x_dir=(1, 0, 0), z_dir=(0, -1, 0))) as chamfer2_piece_7:
        Polygon((1.75, CHAMFER2_SIZE), (1.75 + CHAMFER2_SIZE, CHAMFER2_SIZE * 1.2625456236e-10), (1.75, 0), align=None)
    revolve(axis=Axis((-45.463203436, -53.555339059, -25.749999999), (0, 0, 1)), mode=Mode.SUBTRACT)
    with BuildSketch(Plane(origin=(54.25, -28.2, -25.75), x_dir=(1, 0, 0), z_dir=(0, -1, 0))) as chamfer2_piece_8:
        Polygon((1.75, CHAMFER2_SIZE), (1.75 + CHAMFER2_SIZE, 0), (1.75, 0), align=None)
    revolve(axis=Axis((54.25, -28.2, -25.75), (0, 0, 1)), mode=Mode.SUBTRACT)
    with BuildSketch(Plane(origin=(-31.321067812, -67.697474683, -25.75), x_dir=(-0.5308183932196848, 0.8474855948154352, 0), z_dir=(0.8474855948154352, 0.5308183932196848, 0))) as chamfer2_piece_9:
        Polygon((1.75, CHAMFER2_SIZE), (1.75 + CHAMFER2_SIZE, CHAMFER2_SIZE * 1.26256782806e-10), (1.75, 0), align=None)
    revolve(axis=Axis((-31.321067812, -67.697474683, -25.75), (0, 0, 1)), revolution_arc=115.878465898, mode=Mode.SUBTRACT)
    with BuildSketch(Plane(origin=(-31.321067812, -67.697474683, -25.75), x_dir=(1, 0, 0), z_dir=(0, -1, 0))) as chamfer2_piece_10:
        Polygon((1.75, CHAMFER2_SIZE), (1.75 + CHAMFER2_SIZE, 0), (1.75, 0), align=None)
    revolve(axis=Axis((-31.321067812, -67.697474683, -25.75), (0, 0, 1)), revolution_arc=122.060767051, mode=Mode.SUBTRACT)


solid = part.part
